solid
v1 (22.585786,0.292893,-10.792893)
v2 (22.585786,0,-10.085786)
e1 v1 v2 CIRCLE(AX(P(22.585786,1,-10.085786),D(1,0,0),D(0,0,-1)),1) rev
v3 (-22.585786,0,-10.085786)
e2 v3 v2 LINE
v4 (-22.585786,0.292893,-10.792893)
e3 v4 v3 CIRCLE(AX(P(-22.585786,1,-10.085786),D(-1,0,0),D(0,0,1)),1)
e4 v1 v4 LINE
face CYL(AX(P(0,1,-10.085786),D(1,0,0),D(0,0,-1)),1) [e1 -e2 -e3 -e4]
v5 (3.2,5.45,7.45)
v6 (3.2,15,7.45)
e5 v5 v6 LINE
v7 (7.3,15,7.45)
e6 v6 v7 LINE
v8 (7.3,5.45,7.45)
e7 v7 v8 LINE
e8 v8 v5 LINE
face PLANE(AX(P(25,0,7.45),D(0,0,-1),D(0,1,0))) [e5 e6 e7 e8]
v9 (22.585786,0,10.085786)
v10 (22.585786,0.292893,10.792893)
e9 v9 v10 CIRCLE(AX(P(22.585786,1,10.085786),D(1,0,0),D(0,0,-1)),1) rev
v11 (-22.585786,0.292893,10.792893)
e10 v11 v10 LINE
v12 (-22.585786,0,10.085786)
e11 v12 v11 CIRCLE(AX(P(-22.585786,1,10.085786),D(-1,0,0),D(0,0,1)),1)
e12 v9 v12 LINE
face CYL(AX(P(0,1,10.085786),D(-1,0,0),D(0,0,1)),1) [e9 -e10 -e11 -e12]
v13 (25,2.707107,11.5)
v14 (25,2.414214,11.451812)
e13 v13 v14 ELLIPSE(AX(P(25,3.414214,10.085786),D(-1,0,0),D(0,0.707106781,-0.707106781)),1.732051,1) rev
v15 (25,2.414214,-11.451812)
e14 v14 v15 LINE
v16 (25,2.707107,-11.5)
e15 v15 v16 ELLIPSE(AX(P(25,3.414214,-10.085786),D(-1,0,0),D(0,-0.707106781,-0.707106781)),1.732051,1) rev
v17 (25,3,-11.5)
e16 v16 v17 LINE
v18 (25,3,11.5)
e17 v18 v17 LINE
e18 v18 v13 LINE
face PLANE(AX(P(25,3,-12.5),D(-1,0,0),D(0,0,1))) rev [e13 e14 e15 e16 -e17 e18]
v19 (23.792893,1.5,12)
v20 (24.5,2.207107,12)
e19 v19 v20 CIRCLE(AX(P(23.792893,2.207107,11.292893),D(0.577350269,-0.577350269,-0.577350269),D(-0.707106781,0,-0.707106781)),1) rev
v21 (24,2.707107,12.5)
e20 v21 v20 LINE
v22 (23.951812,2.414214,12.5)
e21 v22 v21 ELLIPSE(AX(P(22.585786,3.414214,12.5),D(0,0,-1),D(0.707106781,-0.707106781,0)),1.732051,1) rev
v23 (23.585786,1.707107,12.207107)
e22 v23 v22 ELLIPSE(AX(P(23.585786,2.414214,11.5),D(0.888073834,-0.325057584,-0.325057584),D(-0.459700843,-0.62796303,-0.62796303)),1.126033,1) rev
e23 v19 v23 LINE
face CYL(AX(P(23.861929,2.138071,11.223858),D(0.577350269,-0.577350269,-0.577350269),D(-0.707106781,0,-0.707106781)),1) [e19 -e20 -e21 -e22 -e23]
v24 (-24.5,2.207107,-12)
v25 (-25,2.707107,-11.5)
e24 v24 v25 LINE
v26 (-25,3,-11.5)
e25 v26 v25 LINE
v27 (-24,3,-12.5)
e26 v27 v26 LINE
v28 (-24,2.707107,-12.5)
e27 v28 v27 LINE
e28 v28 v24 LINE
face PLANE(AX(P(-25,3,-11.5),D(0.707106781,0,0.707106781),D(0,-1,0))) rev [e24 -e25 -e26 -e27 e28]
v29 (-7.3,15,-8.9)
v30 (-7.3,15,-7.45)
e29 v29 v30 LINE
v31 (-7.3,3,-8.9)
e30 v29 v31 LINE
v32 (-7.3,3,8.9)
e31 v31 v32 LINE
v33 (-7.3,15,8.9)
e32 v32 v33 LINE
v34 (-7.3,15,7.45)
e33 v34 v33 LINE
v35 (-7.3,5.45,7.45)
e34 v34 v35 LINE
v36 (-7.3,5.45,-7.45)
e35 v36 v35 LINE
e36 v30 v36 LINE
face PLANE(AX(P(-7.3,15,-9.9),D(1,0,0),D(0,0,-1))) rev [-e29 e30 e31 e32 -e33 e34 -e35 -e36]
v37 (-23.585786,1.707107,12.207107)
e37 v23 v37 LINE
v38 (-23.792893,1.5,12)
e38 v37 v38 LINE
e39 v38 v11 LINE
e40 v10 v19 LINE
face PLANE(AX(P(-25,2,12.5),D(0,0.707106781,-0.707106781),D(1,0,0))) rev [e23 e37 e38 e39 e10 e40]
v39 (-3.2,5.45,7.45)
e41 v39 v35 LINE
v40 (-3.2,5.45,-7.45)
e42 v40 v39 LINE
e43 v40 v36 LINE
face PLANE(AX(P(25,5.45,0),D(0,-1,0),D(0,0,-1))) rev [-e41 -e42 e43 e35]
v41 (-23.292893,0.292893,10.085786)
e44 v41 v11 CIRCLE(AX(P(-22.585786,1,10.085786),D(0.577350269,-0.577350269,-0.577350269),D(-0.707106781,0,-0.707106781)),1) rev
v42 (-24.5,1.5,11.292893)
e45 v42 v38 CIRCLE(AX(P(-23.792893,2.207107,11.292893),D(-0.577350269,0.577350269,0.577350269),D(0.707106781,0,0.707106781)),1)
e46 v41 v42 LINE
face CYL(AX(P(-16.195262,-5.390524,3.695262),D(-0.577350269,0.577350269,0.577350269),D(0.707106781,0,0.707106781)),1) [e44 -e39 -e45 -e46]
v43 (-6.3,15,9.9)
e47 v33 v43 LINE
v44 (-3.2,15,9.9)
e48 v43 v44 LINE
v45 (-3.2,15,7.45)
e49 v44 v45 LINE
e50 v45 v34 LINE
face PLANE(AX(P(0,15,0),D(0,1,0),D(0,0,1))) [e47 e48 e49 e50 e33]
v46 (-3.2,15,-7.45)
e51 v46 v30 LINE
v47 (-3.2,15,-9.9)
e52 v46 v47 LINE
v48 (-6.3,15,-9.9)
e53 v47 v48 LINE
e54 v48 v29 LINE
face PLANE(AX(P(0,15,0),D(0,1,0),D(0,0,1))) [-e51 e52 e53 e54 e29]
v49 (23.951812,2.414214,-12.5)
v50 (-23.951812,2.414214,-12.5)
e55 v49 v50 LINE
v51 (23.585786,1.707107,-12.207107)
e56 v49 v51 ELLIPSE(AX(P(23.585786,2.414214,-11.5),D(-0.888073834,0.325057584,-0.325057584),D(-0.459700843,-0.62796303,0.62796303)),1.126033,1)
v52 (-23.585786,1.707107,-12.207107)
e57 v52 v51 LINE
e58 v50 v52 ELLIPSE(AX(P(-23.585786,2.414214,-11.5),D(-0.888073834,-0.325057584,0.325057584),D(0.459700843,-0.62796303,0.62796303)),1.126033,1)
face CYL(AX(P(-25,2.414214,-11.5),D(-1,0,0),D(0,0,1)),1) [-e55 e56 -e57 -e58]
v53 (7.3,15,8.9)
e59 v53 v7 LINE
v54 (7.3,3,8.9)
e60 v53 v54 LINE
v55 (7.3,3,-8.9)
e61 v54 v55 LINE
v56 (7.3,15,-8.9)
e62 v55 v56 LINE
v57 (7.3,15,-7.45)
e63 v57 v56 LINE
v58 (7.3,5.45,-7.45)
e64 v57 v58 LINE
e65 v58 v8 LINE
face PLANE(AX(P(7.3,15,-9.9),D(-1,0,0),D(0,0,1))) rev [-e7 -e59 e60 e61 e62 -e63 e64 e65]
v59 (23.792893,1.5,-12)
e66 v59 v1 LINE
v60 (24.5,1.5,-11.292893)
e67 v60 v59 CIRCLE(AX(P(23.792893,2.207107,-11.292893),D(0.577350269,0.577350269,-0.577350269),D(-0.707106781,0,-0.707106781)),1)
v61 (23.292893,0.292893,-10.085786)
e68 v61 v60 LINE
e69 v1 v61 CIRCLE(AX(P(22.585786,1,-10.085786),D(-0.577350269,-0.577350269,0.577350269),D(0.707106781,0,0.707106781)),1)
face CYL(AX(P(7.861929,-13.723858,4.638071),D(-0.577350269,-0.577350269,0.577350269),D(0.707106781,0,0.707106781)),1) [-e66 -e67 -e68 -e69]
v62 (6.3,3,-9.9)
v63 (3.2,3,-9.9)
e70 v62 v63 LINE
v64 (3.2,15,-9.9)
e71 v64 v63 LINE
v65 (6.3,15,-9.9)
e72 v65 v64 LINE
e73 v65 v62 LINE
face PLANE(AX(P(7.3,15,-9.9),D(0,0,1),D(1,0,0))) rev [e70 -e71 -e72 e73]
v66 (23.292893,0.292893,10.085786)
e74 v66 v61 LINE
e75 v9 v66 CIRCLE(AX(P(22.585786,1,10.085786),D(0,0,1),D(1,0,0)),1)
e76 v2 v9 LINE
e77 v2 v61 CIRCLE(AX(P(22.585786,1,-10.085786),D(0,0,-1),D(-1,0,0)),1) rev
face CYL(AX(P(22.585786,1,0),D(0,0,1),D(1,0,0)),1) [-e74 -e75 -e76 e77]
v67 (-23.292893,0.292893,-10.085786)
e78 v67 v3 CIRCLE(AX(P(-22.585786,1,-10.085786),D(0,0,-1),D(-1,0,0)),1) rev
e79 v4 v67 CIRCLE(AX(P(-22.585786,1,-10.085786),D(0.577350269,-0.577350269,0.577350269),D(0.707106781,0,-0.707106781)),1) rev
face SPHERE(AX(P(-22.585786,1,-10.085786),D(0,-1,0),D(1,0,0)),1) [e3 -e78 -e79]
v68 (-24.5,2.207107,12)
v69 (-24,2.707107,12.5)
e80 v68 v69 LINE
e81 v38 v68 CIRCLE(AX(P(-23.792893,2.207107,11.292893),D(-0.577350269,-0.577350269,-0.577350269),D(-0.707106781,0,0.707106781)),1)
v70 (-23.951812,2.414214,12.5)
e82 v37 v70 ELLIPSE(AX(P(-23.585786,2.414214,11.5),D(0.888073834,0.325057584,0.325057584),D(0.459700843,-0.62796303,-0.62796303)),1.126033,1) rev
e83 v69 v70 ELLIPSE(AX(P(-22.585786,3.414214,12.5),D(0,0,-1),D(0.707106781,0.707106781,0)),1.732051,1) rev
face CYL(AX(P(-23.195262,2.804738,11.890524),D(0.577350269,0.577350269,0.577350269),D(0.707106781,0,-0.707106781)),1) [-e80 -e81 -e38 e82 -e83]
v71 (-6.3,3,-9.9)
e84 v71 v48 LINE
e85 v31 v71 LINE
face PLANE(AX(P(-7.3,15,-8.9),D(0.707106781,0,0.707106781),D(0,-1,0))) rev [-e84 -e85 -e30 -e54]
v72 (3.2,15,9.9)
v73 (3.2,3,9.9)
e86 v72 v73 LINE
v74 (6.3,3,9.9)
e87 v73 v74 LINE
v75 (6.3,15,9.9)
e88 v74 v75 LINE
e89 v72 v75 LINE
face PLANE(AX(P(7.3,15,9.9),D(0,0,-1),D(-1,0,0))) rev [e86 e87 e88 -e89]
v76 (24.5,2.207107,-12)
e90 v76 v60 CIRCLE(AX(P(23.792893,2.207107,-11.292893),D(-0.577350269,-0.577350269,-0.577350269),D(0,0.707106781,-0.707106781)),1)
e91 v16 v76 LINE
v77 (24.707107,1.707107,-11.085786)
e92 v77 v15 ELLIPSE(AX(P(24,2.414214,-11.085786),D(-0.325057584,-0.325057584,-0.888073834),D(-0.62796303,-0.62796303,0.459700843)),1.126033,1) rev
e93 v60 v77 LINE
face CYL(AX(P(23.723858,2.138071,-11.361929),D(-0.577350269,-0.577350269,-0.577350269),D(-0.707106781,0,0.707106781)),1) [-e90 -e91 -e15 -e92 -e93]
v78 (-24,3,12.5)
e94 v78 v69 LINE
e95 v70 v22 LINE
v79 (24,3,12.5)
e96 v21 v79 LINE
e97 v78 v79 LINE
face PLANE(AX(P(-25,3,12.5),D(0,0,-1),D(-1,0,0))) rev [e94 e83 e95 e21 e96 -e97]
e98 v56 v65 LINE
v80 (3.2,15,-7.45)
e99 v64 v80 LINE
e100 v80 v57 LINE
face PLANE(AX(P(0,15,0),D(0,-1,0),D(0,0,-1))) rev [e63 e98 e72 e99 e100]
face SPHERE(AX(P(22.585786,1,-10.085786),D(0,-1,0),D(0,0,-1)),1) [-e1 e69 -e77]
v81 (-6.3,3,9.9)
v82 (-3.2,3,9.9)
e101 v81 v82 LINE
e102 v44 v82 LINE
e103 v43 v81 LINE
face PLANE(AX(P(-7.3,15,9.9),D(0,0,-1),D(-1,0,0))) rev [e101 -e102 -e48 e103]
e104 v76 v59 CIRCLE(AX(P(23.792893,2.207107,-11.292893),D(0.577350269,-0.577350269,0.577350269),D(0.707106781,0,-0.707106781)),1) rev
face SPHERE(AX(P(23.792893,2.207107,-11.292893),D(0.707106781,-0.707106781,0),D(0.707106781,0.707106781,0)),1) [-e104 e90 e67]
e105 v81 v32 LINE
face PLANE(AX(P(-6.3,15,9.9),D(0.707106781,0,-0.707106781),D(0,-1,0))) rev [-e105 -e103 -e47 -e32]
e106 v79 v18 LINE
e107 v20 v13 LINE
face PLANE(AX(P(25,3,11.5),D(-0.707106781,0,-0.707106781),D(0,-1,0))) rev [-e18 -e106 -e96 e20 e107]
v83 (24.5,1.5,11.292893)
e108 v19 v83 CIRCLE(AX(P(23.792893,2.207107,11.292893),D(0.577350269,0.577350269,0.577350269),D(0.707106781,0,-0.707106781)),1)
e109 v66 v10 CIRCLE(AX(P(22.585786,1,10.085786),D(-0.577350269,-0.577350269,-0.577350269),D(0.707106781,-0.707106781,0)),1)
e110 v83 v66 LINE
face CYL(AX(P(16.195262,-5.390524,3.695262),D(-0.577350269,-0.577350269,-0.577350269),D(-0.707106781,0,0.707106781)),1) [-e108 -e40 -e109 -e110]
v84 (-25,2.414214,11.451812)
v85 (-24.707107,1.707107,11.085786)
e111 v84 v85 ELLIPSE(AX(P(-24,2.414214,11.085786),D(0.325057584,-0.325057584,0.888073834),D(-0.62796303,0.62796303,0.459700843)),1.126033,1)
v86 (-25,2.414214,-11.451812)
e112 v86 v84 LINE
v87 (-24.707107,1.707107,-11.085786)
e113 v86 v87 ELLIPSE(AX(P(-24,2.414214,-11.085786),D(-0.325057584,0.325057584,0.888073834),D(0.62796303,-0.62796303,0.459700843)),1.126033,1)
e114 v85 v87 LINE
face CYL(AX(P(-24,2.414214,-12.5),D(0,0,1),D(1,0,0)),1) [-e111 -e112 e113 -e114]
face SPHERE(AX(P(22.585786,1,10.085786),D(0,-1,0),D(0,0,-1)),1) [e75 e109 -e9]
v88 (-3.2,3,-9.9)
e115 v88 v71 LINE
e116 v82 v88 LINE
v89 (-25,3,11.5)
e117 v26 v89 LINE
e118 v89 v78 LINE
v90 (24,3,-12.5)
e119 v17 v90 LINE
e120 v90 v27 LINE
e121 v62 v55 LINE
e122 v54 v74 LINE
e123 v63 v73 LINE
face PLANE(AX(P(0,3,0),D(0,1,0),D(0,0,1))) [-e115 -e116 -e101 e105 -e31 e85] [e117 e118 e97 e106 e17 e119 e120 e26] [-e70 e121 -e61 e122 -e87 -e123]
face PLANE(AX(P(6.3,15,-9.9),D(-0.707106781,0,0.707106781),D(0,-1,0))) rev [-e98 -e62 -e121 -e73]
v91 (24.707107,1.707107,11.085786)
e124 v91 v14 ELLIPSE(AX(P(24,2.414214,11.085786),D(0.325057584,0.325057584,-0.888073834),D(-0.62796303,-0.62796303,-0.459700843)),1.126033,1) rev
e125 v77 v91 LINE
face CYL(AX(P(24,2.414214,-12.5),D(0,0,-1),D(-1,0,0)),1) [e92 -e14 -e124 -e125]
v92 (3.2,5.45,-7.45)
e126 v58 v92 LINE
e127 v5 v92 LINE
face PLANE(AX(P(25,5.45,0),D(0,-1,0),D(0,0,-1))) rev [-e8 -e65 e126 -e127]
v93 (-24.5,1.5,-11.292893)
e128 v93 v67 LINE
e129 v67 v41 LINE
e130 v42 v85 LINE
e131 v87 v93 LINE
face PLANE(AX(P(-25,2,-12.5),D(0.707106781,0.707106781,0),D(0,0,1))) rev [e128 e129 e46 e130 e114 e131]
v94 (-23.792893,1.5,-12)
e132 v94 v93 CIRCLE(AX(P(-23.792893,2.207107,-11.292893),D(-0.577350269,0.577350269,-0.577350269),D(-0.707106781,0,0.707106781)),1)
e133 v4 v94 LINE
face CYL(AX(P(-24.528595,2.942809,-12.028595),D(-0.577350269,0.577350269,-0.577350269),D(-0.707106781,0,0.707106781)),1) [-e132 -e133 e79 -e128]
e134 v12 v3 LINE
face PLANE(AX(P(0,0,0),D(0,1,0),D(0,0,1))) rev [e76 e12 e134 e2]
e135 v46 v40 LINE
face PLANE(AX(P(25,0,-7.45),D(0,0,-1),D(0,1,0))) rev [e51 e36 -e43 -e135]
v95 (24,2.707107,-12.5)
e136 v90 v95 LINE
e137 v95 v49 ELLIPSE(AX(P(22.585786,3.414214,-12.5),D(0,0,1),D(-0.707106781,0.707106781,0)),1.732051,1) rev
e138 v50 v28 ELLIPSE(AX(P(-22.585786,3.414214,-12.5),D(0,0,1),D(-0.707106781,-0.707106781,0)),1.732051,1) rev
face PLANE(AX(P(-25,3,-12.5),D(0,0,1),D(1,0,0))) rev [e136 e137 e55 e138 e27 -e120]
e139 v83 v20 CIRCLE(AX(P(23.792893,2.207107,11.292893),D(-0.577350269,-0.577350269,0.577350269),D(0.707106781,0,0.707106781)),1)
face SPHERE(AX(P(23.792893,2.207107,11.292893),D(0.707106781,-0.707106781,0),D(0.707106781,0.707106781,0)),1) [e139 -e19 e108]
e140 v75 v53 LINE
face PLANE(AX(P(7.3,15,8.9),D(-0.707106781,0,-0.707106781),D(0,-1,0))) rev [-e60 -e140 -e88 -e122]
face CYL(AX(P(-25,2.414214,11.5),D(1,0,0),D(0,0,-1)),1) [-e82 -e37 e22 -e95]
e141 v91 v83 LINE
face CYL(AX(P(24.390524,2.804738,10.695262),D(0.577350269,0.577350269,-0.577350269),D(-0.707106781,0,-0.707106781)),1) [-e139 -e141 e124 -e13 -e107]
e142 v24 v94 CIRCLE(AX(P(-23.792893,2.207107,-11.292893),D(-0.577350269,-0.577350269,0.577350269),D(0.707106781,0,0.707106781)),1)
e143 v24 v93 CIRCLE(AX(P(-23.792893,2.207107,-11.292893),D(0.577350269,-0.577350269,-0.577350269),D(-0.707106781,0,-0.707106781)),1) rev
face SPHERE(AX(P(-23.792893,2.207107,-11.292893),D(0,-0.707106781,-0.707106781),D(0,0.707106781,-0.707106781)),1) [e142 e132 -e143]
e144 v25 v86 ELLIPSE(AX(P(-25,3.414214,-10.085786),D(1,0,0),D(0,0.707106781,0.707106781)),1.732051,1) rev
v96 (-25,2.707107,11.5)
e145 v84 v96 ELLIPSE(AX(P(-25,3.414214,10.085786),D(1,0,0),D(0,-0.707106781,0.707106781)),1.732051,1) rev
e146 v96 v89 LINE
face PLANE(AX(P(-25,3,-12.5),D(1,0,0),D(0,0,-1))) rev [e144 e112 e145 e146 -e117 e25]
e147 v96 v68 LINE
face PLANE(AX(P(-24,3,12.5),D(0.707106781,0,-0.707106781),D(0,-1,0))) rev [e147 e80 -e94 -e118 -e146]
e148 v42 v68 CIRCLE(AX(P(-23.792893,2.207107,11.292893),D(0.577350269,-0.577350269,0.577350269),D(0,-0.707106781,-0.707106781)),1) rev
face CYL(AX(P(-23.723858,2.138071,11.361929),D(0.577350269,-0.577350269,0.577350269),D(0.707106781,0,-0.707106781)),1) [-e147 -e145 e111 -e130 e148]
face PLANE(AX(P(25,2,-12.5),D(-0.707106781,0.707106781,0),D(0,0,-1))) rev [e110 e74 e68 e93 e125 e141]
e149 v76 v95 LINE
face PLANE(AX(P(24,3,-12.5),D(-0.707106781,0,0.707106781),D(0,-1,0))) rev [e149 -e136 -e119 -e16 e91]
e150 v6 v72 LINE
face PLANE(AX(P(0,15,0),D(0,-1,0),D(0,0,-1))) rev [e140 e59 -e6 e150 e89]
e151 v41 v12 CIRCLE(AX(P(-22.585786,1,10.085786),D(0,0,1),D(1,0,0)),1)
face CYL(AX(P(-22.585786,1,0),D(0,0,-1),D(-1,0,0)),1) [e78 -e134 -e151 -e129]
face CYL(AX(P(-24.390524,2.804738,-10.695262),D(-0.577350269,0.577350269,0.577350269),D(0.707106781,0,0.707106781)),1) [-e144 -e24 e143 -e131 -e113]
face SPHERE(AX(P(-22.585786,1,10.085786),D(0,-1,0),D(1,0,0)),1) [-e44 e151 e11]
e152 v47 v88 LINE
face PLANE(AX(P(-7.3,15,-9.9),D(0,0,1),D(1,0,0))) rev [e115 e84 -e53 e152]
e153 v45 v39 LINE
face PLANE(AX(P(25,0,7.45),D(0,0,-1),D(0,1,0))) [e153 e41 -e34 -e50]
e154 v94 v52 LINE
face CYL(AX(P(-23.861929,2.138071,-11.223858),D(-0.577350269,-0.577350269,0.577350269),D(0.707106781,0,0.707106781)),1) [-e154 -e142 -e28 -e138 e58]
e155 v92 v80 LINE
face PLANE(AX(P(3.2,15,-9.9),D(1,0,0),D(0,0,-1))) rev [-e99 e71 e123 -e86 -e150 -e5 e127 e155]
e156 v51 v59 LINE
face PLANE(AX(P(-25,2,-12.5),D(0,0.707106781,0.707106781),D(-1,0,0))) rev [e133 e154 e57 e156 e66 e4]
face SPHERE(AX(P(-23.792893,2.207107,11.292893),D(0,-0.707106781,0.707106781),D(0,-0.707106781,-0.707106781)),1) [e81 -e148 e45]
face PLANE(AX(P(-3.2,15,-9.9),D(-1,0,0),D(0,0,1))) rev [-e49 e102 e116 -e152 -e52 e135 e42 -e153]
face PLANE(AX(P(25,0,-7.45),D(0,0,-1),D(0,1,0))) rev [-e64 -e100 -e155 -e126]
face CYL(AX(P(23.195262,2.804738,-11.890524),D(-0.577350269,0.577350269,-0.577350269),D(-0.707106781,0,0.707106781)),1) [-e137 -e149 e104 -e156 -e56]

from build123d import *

# Parameters (mm, degrees)
SKETCH1_W           = 50
SKETCH1_H           = 25
BOSS_EXTRUDE1_DEPTH = 3
SKETCH2_W           = 4.1
SKETCH2_H           = 19.8
BOSS_EXTRUDE2_DEPTH = 12
CHAMFER3_SIZE       = 1
CHAMFER1_SIZE       = 2
FILLET1_R           = 1
SKETCH3_W           = 7.45
SKETCH3_H           = 9.55
CUT_EXTRUDE1_DEPTH  = 38.743078836
CHAMFER2_SIZE       = 1


with BuildPart() as part:
    # Sketch1 → Boss-Extrude1 (new body)
    with BuildSketch(Plane(origin=(0, 0, 0), x_dir=(1, 0, 0), z_dir=(0, 1, 0))):
        Rectangle(SKETCH1_W, SKETCH1_H)
    extrude(amount=BOSS_EXTRUDE1_DEPTH)

    # Sketch2 → Boss-Extrude2 (add)
    with BuildSketch(Plane(origin=(0, 3, 0), x_dir=(1, 0, 0), z_dir=(0, 1, 0))):
        with Locations((-5.25, 0)):
            Rectangle(SKETCH2_W, SKETCH2_H)
        with Locations((5.25, 0)):
            Rectangle(SKETCH2_W, SKETCH2_H)
    extrude(amount=BOSS_EXTRUDE2_DEPTH)

    # Chamfer3
    chamfer3_edges = [part.edges().sort_by_distance(p)[0] for p in [
        (25, 1.5, 12.5),
        (-25, 1.5, 12.5),
        (-25, 1.5, -12.5),
        (25, 1.5, -12.5),
    ]]
    chamfer(chamfer3_edges, length=CHAMFER3_SIZE)

    # Chamfer1
    # the kernel refuses this chamfer: 2 mm, written as the material it takes off along each edge
    with BuildSketch(Plane(origin=(-29.143365976, 0, -12.5), x_dir=(0, 0.9996219169112968, -0.027495876610586494), z_dir=(1, 0, 0))) as chamfer1_piece_1:
        Polygon((CHAMFER1_SIZE * 0.999621916911, CHAMFER1_SIZE * 0.0274958766106), (-CHAMFER1_SIZE * 0.0274958766106, CHAMFER1_SIZE * 0.999621916911), (0, 0), align=None)
    extrude(amount=58.286731952, mode=Mode.SUBTRACT)
    with BuildSketch(Plane(origin=(-25, 0, 16.643365976), x_dir=(0.9996219169112968, -0.02749587661058639, 0), z_dir=(0, 0, -1)), Plane(origin=(25, 0, -16.643365976), x_dir=(-0.9996219169112968, -0.02749587661058639, 0), z_dir=(0, 0, 1))) as chamfer1_piece_2:
        Polygon((CHAMFER1_SIZE * 0.999621916911, -CHAMFER1_SIZE * 0.0274958766106), (-CHAMFER1_SIZE * 0.0274958766106, -CHAMFER1_SIZE * 0.999621916911), (0, 0), align=None)
    extrude(amount=33.286731952, mode=Mode.SUBTRACT)
    with BuildSketch(Plane(origin=(29.143365976, 0, 12.5), x_dir=(0, -0.027495876610586365, -0.9996219169112968), z_dir=(-1, 0, 0))) as chamfer1_piece_3:
        Polygon((CHAMFER1_SIZE * 0.999621916911, -CHAMFER1_SIZE * 0.0274958766106), (-CHAMFER1_SIZE * 0.0274958766106, -CHAMFER1_SIZE * 0.999621916911), (0, 0), align=None)
    extrude(amount=58.286731952, mode=Mode.SUBTRACT)

    # Fillet1
    fillet1_edges = [part.edges().sort_by_distance(p)[0] for p in [
        (0, 2, -12.5),
        (-24.75, 1.75, -11.75),
        (-24.25, 1.75, -12.25),
        (23, 0, 0),
        (0, 0, 10.5),
        (-23, 0, 0),
        (0, 0, -10.5),
        (24.75, 1.75, -11.75),
        (24.25, 1.75, -12.25),
        (-25, 2, 0),
        (-24.25, 1.75, 12.25),
        (-24.75, 1.75, 11.75),
        (0, 2, 12.5),
        (24.75, 1.75, 11.75),
        (24.25, 1.75, 12.25),
        (25, 2, 0),
        (23.75, 0.75, 11.25),
        (-23.75, 0.75, 11.25),
        (23.75, 0.75, -11.25),
        (-23.75, 0.75, -11.25),
    ]]
    fillet(fillet1_edges, radius=FILLET1_R)

    # Sketch3 → Cut-Extrude1 (cut, through all)
    with BuildSketch(Plane.ZY.offset(7.3)):
        with Locations((-3.725, 10.225)):
            Rectangle(SKETCH3_W, SKETCH3_H)
        with Locations((3.725, 10.225)):
            Rectangle(SKETCH3_W, SKETCH3_H)
    extrude(amount=-CUT_EXTRUDE1_DEPTH, mode=Mode.SUBTRACT)

    # Chamfer2
    chamfer2_edges = [part.edges().sort_by_distance(p)[0] for p in [
        (-7.3, 9, -9.9),
        (-7.3, 9, 9.9),
        (7.3, 9, 9.9),
        (7.3, 9, -9.9),
    ]]
    chamfer(chamfer2_edges, length=CHAMFER2_SIZE)


solid = part.part
